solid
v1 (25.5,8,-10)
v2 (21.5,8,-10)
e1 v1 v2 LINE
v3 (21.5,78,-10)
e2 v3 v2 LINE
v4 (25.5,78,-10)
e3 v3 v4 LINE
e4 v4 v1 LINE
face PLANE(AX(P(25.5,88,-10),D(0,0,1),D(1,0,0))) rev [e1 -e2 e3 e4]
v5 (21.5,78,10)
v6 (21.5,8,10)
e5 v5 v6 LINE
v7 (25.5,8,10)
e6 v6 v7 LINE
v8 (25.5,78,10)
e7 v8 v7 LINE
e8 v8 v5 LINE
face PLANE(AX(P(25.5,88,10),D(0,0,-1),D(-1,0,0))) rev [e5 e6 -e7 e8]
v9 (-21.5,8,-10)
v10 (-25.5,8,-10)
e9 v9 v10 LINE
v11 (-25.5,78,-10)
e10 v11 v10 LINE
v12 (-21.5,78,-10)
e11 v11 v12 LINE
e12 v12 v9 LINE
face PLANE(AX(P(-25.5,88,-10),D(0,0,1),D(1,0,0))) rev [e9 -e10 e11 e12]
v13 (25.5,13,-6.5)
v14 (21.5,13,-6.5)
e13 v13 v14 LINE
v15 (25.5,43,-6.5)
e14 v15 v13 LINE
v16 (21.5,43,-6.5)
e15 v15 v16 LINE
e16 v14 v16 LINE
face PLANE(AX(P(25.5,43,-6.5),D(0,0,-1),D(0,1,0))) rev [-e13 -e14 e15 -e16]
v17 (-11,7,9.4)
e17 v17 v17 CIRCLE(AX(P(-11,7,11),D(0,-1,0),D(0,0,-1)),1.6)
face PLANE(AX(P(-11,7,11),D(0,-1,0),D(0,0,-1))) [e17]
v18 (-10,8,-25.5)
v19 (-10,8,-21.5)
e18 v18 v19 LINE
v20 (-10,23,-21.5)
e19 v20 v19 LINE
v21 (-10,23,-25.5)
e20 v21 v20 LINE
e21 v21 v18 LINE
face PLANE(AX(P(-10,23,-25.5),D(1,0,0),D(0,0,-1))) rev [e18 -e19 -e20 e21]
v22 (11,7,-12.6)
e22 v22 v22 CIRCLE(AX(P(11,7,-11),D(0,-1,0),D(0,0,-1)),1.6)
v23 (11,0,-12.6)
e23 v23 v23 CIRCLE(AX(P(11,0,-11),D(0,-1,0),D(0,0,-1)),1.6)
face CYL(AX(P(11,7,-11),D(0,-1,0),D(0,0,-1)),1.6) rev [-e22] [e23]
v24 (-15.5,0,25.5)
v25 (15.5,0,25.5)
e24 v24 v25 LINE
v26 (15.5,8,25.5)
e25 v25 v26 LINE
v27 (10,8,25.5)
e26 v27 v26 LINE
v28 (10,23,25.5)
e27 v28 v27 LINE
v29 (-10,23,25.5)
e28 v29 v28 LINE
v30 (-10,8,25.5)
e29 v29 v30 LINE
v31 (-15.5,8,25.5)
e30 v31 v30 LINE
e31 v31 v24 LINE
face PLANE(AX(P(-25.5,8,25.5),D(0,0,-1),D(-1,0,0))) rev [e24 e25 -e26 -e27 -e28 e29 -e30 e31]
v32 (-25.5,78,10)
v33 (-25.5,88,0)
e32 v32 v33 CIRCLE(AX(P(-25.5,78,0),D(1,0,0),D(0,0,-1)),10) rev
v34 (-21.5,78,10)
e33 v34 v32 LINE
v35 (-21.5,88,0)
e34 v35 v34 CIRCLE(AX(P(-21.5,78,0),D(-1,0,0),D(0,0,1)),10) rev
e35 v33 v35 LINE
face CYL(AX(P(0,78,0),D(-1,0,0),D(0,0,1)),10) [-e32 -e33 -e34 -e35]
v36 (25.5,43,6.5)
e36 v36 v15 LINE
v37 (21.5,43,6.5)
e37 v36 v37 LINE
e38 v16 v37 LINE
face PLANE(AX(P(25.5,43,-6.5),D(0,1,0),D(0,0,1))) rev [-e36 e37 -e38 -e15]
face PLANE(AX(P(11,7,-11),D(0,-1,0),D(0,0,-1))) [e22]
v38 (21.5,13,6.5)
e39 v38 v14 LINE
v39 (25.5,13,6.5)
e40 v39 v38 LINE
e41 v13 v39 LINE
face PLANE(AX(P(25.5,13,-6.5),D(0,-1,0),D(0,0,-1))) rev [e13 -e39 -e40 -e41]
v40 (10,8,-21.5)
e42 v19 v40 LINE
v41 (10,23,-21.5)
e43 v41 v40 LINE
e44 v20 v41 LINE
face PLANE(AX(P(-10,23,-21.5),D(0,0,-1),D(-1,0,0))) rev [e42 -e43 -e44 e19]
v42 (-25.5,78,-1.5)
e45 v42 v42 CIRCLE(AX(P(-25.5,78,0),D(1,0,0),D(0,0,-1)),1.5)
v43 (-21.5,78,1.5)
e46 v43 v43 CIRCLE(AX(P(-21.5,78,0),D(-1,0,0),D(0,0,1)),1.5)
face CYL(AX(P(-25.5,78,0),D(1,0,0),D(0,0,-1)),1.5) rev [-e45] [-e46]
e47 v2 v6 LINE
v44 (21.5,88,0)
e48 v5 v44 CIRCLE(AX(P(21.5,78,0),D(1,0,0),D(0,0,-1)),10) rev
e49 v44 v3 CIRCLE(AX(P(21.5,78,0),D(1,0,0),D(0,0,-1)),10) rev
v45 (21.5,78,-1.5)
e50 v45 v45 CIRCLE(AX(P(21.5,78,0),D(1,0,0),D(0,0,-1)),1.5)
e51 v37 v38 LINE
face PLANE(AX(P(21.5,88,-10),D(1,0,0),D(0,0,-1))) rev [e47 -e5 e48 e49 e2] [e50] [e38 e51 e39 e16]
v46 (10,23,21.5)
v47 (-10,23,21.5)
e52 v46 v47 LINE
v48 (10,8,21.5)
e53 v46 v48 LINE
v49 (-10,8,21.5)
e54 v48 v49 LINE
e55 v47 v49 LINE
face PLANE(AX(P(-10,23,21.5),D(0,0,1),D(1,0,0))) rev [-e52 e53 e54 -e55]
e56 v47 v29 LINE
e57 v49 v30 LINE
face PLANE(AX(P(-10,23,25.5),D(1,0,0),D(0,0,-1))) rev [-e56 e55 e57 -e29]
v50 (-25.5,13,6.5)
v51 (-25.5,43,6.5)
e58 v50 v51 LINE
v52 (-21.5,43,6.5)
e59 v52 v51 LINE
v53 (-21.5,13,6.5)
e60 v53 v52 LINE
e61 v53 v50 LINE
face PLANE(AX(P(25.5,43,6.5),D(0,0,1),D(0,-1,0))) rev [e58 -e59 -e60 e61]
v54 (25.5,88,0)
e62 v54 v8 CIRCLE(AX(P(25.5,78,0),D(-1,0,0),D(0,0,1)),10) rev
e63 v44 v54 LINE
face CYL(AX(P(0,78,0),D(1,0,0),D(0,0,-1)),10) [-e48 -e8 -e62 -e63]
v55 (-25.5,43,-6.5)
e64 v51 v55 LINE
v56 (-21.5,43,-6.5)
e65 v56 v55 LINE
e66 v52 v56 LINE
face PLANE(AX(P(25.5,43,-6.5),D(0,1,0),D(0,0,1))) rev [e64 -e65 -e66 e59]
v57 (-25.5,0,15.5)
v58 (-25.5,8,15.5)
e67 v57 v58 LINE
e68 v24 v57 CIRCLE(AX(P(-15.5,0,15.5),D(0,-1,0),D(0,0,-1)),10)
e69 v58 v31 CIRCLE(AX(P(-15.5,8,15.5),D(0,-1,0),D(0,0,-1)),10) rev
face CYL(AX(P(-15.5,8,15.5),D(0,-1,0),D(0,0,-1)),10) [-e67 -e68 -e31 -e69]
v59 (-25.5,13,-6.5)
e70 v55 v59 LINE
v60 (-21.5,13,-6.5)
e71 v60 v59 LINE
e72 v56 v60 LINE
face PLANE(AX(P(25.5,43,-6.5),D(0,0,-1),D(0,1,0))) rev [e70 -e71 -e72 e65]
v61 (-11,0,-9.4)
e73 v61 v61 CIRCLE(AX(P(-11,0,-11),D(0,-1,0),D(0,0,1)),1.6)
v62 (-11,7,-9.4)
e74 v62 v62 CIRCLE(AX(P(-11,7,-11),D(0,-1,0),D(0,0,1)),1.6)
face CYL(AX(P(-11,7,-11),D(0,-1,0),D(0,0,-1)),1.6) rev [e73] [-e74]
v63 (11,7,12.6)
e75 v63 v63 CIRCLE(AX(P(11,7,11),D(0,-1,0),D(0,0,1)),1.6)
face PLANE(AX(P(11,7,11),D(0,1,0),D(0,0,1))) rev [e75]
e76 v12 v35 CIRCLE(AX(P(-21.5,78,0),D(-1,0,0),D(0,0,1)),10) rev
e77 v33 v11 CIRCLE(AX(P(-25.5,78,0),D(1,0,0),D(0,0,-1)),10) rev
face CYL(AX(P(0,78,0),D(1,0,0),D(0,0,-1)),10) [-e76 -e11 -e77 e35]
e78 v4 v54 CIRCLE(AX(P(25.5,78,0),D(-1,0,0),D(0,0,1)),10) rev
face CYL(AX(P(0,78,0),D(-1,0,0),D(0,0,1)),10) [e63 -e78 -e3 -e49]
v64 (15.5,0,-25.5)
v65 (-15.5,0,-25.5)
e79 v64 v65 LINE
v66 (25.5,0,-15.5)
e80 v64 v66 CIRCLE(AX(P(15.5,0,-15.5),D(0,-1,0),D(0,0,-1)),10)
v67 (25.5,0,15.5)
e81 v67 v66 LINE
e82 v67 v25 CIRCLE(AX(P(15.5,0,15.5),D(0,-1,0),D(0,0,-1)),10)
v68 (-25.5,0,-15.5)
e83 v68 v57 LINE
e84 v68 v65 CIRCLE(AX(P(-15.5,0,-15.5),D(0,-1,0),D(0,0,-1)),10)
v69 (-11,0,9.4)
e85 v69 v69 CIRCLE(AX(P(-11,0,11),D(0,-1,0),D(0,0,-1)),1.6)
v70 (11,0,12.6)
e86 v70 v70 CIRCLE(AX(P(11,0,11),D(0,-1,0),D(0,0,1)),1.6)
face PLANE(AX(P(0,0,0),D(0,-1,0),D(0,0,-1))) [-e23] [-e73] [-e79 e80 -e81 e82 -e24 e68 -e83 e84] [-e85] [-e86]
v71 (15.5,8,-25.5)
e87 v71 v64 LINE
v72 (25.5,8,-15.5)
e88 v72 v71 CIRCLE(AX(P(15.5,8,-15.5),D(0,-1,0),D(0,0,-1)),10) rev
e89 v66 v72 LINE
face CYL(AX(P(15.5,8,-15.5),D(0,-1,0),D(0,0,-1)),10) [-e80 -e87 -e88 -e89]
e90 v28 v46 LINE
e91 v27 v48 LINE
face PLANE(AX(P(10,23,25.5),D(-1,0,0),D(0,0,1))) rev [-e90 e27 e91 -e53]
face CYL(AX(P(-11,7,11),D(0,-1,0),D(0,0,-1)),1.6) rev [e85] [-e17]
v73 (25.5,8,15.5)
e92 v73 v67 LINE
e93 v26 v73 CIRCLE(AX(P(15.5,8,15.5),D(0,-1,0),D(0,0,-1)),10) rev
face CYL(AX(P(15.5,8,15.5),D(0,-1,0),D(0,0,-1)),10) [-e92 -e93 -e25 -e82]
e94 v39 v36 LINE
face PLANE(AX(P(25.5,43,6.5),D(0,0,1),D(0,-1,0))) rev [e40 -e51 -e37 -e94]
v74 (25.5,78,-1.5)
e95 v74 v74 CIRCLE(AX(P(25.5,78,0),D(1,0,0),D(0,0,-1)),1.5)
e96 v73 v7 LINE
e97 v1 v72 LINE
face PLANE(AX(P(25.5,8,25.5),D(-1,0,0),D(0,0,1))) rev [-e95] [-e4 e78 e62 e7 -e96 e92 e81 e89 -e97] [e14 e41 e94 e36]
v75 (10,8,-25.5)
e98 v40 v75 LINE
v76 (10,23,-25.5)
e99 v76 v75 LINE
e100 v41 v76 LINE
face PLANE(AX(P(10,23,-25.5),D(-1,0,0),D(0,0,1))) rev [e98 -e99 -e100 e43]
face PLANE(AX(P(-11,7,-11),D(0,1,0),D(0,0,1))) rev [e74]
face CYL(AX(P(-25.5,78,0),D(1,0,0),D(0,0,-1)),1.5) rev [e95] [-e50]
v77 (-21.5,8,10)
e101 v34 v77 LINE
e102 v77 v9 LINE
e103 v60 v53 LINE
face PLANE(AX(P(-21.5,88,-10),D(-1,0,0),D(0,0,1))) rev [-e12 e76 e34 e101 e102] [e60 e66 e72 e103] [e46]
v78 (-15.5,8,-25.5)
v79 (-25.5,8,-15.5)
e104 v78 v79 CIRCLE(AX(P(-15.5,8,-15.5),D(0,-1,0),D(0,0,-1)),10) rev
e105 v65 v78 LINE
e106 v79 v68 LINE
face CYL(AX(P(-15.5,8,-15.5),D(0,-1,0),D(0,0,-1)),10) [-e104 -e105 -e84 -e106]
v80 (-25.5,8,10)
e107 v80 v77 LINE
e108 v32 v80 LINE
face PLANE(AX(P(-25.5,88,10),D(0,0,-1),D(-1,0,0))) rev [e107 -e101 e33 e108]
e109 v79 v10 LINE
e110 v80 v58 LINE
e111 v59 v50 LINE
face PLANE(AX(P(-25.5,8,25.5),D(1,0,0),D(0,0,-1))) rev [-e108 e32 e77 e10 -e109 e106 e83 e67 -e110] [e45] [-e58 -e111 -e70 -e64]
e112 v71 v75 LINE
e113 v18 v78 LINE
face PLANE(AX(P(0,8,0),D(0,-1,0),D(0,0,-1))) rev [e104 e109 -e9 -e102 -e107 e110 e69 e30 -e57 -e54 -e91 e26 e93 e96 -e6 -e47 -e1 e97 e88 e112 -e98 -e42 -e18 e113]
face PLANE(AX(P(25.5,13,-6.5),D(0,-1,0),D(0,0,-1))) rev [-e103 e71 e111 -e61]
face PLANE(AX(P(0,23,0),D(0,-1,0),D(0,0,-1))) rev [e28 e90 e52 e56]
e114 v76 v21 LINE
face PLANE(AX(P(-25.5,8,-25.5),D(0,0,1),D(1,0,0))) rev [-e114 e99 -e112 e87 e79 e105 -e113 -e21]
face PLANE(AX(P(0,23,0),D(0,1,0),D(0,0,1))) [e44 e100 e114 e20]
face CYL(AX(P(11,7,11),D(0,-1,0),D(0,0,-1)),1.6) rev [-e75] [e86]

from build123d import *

# Parameters (mm, degrees)
ESBO_O1_W                  = 51
ESBO_O1_H                  = 51
RESSALTO_EXTRUS_O1_DEPTH   = 8
ESBO_O2_W                  = 4
ESBO_O2_H                  = 20
RESSALTO_EXTRUS_O2_DEPTH   = 80
ESBO_O4_W                  = 20
ESBO_O4_H                  = 4
RESSALTO_EXTRUS_O3_DEPTH   = 15
ESBO_O5_R                  = 1.6
CORTE_EXTRUS_O2_DEPTH      = 7
FILETE2_R                  = 10
CORTE_EXTRUS_O3_DEPTH      = 105.858237635
CORTE_EXTRUS_O3_DEPTH_BACK = 105.858237635
ESBO_O6_W                  = 13
ESBO_O6_H                  = 30
ESBO_O7_R                  = 1.5
CORTE_EXTRUS_O4_DEPTH      = 105.858237635
FILETE6_R                  = 10


with BuildPart() as part:
    # Esboço1 → Ressalto-extrusão1 (new body)
    with BuildSketch(Plane(origin=(0, 0, 0), x_dir=(1, 0, 0), z_dir=(0, 1, 0))):
        Rectangle(ESBO_O1_W, ESBO_O1_H)
    extrude(amount=RESSALTO_EXTRUS_O1_DEPTH)

    # Esboço2 → Ressalto-extrusão2 (add)
    with BuildSketch(Plane(origin=(0, 8, 0), x_dir=(1, 0, 0), z_dir=(0, 1, 0))):
        with Locations((-23.5, 0)):
            Rectangle(ESBO_O2_W, ESBO_O2_H)
        with Locations((23.5, 0)):
            Rectangle(ESBO_O2_W, ESBO_O2_H)
    extrude(amount=RESSALTO_EXTRUS_O2_DEPTH)

    # Esboço4 → Ressalto-extrusão3 (add)
    with BuildSketch(Plane(origin=(0, 8, 0), x_dir=(1, 0, 0), z_dir=(0, 1, 0))):
        with Locations((0, 23.5)):
            Rectangle(ESBO_O4_W, ESBO_O4_H)
        with Locations((0, -23.5)):
            Rectangle(ESBO_O4_W, ESBO_O4_H)
    extrude(amount=RESSALTO_EXTRUS_O3_DEPTH)

    # Esboço5 → Corte-extrusão2 (cut)
    with BuildSketch(Plane.XZ):
        with Locations(Location((-11, 11, 0), (0, 0, 270))):
            Circle(ESBO_O5_R)
        with Locations(Location((11, 11, 0), (0, 0, 90))):
            Circle(ESBO_O5_R)
        with Locations(Location((11, -11, 0), (0, 0, 270))):
            Circle(ESBO_O5_R)
        with Locations(Location((-11, -11, 0), (0, 0, 90))):
            Circle(ESBO_O5_R)
    extrude(amount=-CORTE_EXTRUS_O2_DEPTH, mode=Mode.SUBTRACT)

    # Filete2
    filete2_edges = [part.edges().sort_by_distance(p)[0] for p in [
        (25.5, 4, 25.5),
        (-25.5, 4, 25.5),
        (-25.5, 4, -25.5),
        (25.5, 4, -25.5),
    ]]
    fillet(filete2_edges, radius=FILETE2_R)

    # Esboço6 → Corte-extrusão3 (cut, two sides: drawn at the far end of the back side and taken through both)
    with BuildSketch(Plane.ZY.offset(25.5).offset(-CORTE_EXTRUS_O3_DEPTH_BACK)):
        with Locations((0, 28)):
            Rectangle(ESBO_O6_W, ESBO_O6_H)
    extrude(amount=CORTE_EXTRUS_O3_DEPTH + CORTE_EXTRUS_O3_DEPTH_BACK, mode=Mode.SUBTRACT)

    # Esboço7 → Corte-extrusão4 (cut, through all)
    with BuildSketch(Plane(origin=(25.5, 0, 0), x_dir=(0, 0, -1), z_dir=(1, 0, 0))):
        with Locations((0, 78)):
            Circle(ESBO_O7_R)
    extrude(amount=-CORTE_EXTRUS_O4_DEPTH, mode=Mode.SUBTRACT)

    # Filete6
    filete6_edges = [part.edges().sort_by_distance(p)[0] for p in [
        (23.5, 88, -10),
        (23.5, 88, 10),
        (-23.5, 88, -10),
        (-23.5, 88, 10),
    ]]
    fillet(filete6_edges, radius=FILETE6_R - 0.0001)  # a hair under: the kernel refuses the full size


solid = part.part
